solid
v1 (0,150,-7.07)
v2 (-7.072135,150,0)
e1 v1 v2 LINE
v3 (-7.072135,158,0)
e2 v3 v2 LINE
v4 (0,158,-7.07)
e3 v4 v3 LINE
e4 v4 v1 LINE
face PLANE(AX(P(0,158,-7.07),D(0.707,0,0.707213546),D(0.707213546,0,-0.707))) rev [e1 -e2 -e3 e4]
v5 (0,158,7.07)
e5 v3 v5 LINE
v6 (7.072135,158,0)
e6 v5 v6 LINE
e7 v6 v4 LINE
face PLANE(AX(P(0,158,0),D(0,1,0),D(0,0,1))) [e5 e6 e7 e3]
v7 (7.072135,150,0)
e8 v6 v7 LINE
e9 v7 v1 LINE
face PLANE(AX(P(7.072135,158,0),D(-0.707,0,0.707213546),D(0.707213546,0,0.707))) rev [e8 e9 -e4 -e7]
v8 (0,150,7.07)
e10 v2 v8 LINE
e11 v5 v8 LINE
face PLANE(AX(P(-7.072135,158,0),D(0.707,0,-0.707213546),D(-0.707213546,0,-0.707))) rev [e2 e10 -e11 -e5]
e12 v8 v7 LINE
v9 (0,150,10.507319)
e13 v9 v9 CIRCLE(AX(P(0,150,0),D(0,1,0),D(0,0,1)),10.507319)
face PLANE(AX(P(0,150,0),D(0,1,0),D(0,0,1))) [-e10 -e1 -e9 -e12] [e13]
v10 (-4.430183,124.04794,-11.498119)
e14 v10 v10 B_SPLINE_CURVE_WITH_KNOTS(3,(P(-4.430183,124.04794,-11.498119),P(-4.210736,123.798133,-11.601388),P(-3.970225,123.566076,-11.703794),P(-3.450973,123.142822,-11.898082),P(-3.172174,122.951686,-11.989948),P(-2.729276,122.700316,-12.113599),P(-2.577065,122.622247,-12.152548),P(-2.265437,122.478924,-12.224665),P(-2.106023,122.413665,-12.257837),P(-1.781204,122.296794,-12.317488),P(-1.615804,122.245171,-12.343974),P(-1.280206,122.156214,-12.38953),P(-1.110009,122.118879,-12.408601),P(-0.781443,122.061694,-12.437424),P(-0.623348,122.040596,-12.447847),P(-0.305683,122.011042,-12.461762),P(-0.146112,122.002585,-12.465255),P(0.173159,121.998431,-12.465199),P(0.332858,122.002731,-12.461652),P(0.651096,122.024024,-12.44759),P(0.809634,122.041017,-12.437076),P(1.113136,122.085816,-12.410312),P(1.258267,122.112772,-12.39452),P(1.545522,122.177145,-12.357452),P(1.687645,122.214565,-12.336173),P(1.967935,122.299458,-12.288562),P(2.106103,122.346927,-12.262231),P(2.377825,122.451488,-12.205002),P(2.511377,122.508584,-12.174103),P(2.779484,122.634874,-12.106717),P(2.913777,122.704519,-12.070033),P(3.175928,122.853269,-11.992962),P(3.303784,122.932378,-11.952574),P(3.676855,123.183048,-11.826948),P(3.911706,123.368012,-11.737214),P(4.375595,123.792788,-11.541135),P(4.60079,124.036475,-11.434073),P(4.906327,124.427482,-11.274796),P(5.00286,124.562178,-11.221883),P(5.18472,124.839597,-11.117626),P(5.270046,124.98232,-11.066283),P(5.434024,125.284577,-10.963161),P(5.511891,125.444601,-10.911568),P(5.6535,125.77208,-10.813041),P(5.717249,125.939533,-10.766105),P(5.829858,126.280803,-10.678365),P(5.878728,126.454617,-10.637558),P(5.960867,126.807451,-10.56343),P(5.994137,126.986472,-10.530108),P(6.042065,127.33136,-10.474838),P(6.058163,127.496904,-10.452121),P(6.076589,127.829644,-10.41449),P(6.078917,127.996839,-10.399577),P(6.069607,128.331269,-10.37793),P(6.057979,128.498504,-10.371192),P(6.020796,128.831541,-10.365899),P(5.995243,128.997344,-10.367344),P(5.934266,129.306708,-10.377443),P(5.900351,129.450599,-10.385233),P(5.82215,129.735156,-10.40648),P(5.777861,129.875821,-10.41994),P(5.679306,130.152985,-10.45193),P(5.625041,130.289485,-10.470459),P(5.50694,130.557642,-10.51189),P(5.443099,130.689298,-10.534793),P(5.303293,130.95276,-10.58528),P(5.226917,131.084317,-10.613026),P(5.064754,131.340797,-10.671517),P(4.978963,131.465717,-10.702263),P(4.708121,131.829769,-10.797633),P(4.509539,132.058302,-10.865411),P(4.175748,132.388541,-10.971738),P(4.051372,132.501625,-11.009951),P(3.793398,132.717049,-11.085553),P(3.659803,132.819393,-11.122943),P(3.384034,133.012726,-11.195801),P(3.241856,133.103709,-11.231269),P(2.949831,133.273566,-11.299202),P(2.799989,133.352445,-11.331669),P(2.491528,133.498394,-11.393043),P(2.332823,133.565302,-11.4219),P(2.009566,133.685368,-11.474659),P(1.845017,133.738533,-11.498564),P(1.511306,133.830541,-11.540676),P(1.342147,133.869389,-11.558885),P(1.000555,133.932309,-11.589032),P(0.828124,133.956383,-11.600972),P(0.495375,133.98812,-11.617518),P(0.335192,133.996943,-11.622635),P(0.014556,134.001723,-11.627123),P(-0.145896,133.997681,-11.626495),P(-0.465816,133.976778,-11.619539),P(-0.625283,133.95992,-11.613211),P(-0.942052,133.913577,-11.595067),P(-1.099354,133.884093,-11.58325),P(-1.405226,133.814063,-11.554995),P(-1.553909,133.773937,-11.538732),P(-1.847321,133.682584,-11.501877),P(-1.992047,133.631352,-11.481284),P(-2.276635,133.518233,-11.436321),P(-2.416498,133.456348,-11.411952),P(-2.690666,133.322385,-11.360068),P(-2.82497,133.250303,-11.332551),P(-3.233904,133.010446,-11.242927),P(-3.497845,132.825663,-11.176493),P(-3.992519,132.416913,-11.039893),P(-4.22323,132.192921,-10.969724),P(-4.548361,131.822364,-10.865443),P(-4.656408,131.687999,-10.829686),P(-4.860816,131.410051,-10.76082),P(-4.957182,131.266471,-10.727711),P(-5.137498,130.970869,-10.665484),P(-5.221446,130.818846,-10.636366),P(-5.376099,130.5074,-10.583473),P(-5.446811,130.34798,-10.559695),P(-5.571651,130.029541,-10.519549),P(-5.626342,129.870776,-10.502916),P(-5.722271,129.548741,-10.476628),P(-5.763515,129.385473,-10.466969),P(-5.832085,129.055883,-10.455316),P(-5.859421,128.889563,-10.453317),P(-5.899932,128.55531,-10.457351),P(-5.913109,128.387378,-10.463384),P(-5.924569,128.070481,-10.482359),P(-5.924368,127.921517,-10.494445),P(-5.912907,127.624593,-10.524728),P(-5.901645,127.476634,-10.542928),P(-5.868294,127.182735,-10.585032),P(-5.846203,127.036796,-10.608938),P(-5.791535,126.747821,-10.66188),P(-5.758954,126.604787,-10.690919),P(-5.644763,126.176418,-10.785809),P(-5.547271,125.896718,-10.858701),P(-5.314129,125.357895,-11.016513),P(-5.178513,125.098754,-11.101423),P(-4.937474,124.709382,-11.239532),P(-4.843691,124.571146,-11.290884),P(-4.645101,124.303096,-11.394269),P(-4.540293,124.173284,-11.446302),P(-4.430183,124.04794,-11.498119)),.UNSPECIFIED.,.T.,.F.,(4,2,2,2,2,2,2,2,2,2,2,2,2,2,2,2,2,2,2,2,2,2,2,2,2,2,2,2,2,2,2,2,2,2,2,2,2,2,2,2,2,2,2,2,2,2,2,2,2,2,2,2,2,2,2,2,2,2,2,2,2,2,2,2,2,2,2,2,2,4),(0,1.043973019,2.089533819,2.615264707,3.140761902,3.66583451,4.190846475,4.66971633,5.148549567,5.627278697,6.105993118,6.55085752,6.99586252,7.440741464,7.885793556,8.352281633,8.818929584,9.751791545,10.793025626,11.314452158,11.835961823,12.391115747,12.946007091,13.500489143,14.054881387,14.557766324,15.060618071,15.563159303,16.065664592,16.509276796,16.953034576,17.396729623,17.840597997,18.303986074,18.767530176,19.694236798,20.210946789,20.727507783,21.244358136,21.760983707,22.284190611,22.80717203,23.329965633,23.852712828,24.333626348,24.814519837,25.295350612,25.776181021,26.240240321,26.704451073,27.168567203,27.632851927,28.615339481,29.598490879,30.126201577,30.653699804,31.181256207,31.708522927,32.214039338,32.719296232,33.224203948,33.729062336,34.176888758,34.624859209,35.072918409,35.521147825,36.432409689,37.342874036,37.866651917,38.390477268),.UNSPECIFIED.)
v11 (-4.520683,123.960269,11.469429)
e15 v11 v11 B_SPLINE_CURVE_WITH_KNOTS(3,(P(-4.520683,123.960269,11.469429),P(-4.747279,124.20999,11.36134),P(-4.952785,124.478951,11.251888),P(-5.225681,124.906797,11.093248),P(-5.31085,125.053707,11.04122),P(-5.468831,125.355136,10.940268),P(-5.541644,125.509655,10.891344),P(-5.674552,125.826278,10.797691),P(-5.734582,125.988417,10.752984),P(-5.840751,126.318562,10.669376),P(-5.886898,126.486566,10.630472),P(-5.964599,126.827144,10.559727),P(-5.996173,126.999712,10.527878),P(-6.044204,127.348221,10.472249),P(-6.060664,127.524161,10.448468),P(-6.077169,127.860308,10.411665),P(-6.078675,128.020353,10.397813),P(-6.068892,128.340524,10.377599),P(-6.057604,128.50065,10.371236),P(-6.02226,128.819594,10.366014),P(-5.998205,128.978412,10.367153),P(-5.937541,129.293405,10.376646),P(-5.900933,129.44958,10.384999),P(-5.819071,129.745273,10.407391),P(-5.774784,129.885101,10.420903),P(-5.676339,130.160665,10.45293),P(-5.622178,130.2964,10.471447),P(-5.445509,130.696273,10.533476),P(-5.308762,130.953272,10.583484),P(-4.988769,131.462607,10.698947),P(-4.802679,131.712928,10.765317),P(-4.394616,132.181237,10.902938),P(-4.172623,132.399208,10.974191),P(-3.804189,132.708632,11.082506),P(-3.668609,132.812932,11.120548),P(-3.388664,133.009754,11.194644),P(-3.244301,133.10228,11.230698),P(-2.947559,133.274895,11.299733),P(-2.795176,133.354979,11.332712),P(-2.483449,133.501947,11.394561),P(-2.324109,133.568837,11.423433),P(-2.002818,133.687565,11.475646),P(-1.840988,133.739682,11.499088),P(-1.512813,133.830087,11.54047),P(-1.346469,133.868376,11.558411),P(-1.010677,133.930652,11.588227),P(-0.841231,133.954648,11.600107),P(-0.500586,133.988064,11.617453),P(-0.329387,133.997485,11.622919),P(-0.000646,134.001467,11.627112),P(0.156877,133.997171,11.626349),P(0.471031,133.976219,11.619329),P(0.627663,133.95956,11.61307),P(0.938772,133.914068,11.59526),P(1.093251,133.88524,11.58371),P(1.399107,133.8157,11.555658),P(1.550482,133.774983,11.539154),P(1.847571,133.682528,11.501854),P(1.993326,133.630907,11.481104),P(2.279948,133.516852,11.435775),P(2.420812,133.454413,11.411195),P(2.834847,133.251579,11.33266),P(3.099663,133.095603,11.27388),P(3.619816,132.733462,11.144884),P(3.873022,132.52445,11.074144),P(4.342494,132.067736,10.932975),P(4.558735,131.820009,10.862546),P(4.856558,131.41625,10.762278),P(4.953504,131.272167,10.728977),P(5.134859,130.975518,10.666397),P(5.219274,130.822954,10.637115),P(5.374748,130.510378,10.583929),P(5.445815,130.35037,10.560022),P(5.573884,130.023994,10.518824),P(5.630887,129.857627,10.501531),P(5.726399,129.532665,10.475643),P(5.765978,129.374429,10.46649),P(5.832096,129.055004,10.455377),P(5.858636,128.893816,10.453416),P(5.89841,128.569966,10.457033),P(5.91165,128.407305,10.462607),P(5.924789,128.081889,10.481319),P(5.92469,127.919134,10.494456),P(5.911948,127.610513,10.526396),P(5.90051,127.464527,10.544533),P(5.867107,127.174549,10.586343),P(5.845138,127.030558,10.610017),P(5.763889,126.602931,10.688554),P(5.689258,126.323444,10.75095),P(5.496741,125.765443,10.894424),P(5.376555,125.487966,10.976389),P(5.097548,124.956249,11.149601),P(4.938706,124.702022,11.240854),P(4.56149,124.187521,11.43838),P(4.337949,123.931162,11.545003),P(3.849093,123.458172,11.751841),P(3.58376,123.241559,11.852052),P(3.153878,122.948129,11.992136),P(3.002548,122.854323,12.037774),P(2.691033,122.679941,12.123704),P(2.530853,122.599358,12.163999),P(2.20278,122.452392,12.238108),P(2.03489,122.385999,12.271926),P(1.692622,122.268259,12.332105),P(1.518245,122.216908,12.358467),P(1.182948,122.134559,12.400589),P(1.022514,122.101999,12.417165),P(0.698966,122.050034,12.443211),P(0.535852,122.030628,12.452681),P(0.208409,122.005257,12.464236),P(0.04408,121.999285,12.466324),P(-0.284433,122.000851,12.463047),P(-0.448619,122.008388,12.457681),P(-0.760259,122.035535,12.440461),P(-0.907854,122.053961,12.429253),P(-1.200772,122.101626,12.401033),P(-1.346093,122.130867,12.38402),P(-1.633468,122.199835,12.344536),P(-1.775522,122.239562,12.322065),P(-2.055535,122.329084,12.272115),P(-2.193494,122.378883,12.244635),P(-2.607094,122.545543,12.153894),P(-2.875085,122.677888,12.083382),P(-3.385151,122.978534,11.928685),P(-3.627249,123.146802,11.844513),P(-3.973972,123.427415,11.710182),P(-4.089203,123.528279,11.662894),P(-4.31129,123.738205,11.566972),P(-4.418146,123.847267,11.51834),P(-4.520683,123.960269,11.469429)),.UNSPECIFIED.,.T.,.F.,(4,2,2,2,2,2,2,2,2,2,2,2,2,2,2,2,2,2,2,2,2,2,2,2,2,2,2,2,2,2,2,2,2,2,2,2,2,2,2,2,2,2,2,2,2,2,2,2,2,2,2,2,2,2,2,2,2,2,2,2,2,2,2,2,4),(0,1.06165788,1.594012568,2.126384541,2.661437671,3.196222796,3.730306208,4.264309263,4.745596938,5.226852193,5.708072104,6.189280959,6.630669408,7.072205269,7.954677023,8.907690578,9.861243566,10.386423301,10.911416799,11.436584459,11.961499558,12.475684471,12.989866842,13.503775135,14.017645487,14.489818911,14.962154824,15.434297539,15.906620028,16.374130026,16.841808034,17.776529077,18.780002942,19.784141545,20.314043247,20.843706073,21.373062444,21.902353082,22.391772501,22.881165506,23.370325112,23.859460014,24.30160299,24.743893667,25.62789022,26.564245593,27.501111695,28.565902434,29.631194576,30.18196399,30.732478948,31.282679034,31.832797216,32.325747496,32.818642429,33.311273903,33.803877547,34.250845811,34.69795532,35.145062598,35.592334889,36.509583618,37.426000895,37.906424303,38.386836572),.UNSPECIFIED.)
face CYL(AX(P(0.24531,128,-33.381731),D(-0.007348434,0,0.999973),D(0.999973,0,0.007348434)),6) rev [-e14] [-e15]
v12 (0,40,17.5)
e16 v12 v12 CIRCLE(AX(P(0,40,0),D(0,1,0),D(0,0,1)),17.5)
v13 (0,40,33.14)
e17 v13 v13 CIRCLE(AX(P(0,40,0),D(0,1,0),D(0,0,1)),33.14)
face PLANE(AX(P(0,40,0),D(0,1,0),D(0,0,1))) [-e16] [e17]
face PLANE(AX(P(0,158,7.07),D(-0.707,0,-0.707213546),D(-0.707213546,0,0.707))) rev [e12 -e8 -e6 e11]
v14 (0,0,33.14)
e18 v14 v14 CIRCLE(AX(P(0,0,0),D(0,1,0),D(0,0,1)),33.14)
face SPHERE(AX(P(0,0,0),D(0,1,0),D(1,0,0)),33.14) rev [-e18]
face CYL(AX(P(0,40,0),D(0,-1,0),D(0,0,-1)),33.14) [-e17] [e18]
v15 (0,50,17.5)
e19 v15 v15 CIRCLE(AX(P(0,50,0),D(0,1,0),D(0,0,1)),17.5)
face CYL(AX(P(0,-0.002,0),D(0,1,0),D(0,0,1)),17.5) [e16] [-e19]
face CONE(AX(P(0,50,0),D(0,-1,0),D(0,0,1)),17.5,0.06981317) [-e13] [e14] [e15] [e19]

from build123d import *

# Parameters (mm, degrees)
SKETCH1_R           = 33.14
BOSS_EXTRUDE7_DEPTH = 40
SKETCH4_R           = 17.5
CUT_EXTRUDE1_DEPTH  = 5
BOSS_EXTRUDE9_DEPTH = 8
SKETCH7_R           = 6
CUT_EXTRUDE2_DEPTH  = 178.288271755


# Read off the part's stored shape, not the designer's step: Boss-Extrude8
with BuildPart() as part:
    # Sketch1 → Boss-Extrude7 (new body)
    with BuildSketch(Plane(origin=(0, 0, 0), x_dir=(1, 0, 0), z_dir=(0, 1, 0))):
        with Locations(Location((0, 0, 0), (0, 0, 270))):
            Circle(SKETCH1_R)
    extrude(amount=BOSS_EXTRUDE7_DEPTH)

    # Sketch2 → Cut-Revolve1 (revolve, cut)
    with BuildSketch(Plane.XY):
        with BuildLine():
            Line((0, 33.14), (0, 0))
            Line((0, 0), (33.14, 0))
            ThreePointArc((33.14, 0), (23.433518729, 23.433518729), (0, 33.14))
        make_face()
    revolve(axis=Axis((0, 33.14, 0), (0, -1, 0)), mode=Mode.SUBTRACT)

    # Sketch4 → Cut-Extrude1 (cut)
    with BuildSketch(Plane(origin=(0, 40, 0), x_dir=(1, 0, 0), z_dir=(0, 1, 0))):
        with Locations(Location((0, 0, 0), (0, 0, 270))):
            Circle(SKETCH4_R)
    extrude(amount=-CUT_EXTRUDE1_DEPTH, mode=Mode.SUBTRACT)

    # Boss-Extrude8 outline → Boss-Extrude8 (revolve)
    with BuildSketch(Plane.XY):
        Polygon((17.5, 35), (17.5, 50), (10.507318806, 150), (0, 150), (0, 35), align=None)
    revolve(axis=Axis((0, 0, 0), (0, 1, 0)))

    # Sketch6 → Boss-Extrude9 (add)
    with BuildSketch(Plane(origin=(0, 150, 0), x_dir=(1, 0, 0), z_dir=(0, 1, 0))):
        Polygon((0, 7.07), (-7.072135463, 0), (0, -7.07), (7.072135463, 0), align=None)
    extrude(amount=BOSS_EXTRUDE9_DEPTH)

    # Sketch7 → Cut-Extrude2 (cut, through all)
    with BuildSketch(Plane(origin=(-0.293937447, 0, 39.998930323), x_dir=(0.9999729998922554, 0, 0.007348434287890893), z_dir=(-0.007348434287890893, -1.1102230246251565e-15, 0.9999729998922554))):
        with Locations(Location((0, 128, 0), (0, 0, 270.874748169))):
            Circle(SKETCH7_R)
    extrude(amount=-CUT_EXTRUDE2_DEPTH, mode=Mode.SUBTRACT)


solid = part.part
